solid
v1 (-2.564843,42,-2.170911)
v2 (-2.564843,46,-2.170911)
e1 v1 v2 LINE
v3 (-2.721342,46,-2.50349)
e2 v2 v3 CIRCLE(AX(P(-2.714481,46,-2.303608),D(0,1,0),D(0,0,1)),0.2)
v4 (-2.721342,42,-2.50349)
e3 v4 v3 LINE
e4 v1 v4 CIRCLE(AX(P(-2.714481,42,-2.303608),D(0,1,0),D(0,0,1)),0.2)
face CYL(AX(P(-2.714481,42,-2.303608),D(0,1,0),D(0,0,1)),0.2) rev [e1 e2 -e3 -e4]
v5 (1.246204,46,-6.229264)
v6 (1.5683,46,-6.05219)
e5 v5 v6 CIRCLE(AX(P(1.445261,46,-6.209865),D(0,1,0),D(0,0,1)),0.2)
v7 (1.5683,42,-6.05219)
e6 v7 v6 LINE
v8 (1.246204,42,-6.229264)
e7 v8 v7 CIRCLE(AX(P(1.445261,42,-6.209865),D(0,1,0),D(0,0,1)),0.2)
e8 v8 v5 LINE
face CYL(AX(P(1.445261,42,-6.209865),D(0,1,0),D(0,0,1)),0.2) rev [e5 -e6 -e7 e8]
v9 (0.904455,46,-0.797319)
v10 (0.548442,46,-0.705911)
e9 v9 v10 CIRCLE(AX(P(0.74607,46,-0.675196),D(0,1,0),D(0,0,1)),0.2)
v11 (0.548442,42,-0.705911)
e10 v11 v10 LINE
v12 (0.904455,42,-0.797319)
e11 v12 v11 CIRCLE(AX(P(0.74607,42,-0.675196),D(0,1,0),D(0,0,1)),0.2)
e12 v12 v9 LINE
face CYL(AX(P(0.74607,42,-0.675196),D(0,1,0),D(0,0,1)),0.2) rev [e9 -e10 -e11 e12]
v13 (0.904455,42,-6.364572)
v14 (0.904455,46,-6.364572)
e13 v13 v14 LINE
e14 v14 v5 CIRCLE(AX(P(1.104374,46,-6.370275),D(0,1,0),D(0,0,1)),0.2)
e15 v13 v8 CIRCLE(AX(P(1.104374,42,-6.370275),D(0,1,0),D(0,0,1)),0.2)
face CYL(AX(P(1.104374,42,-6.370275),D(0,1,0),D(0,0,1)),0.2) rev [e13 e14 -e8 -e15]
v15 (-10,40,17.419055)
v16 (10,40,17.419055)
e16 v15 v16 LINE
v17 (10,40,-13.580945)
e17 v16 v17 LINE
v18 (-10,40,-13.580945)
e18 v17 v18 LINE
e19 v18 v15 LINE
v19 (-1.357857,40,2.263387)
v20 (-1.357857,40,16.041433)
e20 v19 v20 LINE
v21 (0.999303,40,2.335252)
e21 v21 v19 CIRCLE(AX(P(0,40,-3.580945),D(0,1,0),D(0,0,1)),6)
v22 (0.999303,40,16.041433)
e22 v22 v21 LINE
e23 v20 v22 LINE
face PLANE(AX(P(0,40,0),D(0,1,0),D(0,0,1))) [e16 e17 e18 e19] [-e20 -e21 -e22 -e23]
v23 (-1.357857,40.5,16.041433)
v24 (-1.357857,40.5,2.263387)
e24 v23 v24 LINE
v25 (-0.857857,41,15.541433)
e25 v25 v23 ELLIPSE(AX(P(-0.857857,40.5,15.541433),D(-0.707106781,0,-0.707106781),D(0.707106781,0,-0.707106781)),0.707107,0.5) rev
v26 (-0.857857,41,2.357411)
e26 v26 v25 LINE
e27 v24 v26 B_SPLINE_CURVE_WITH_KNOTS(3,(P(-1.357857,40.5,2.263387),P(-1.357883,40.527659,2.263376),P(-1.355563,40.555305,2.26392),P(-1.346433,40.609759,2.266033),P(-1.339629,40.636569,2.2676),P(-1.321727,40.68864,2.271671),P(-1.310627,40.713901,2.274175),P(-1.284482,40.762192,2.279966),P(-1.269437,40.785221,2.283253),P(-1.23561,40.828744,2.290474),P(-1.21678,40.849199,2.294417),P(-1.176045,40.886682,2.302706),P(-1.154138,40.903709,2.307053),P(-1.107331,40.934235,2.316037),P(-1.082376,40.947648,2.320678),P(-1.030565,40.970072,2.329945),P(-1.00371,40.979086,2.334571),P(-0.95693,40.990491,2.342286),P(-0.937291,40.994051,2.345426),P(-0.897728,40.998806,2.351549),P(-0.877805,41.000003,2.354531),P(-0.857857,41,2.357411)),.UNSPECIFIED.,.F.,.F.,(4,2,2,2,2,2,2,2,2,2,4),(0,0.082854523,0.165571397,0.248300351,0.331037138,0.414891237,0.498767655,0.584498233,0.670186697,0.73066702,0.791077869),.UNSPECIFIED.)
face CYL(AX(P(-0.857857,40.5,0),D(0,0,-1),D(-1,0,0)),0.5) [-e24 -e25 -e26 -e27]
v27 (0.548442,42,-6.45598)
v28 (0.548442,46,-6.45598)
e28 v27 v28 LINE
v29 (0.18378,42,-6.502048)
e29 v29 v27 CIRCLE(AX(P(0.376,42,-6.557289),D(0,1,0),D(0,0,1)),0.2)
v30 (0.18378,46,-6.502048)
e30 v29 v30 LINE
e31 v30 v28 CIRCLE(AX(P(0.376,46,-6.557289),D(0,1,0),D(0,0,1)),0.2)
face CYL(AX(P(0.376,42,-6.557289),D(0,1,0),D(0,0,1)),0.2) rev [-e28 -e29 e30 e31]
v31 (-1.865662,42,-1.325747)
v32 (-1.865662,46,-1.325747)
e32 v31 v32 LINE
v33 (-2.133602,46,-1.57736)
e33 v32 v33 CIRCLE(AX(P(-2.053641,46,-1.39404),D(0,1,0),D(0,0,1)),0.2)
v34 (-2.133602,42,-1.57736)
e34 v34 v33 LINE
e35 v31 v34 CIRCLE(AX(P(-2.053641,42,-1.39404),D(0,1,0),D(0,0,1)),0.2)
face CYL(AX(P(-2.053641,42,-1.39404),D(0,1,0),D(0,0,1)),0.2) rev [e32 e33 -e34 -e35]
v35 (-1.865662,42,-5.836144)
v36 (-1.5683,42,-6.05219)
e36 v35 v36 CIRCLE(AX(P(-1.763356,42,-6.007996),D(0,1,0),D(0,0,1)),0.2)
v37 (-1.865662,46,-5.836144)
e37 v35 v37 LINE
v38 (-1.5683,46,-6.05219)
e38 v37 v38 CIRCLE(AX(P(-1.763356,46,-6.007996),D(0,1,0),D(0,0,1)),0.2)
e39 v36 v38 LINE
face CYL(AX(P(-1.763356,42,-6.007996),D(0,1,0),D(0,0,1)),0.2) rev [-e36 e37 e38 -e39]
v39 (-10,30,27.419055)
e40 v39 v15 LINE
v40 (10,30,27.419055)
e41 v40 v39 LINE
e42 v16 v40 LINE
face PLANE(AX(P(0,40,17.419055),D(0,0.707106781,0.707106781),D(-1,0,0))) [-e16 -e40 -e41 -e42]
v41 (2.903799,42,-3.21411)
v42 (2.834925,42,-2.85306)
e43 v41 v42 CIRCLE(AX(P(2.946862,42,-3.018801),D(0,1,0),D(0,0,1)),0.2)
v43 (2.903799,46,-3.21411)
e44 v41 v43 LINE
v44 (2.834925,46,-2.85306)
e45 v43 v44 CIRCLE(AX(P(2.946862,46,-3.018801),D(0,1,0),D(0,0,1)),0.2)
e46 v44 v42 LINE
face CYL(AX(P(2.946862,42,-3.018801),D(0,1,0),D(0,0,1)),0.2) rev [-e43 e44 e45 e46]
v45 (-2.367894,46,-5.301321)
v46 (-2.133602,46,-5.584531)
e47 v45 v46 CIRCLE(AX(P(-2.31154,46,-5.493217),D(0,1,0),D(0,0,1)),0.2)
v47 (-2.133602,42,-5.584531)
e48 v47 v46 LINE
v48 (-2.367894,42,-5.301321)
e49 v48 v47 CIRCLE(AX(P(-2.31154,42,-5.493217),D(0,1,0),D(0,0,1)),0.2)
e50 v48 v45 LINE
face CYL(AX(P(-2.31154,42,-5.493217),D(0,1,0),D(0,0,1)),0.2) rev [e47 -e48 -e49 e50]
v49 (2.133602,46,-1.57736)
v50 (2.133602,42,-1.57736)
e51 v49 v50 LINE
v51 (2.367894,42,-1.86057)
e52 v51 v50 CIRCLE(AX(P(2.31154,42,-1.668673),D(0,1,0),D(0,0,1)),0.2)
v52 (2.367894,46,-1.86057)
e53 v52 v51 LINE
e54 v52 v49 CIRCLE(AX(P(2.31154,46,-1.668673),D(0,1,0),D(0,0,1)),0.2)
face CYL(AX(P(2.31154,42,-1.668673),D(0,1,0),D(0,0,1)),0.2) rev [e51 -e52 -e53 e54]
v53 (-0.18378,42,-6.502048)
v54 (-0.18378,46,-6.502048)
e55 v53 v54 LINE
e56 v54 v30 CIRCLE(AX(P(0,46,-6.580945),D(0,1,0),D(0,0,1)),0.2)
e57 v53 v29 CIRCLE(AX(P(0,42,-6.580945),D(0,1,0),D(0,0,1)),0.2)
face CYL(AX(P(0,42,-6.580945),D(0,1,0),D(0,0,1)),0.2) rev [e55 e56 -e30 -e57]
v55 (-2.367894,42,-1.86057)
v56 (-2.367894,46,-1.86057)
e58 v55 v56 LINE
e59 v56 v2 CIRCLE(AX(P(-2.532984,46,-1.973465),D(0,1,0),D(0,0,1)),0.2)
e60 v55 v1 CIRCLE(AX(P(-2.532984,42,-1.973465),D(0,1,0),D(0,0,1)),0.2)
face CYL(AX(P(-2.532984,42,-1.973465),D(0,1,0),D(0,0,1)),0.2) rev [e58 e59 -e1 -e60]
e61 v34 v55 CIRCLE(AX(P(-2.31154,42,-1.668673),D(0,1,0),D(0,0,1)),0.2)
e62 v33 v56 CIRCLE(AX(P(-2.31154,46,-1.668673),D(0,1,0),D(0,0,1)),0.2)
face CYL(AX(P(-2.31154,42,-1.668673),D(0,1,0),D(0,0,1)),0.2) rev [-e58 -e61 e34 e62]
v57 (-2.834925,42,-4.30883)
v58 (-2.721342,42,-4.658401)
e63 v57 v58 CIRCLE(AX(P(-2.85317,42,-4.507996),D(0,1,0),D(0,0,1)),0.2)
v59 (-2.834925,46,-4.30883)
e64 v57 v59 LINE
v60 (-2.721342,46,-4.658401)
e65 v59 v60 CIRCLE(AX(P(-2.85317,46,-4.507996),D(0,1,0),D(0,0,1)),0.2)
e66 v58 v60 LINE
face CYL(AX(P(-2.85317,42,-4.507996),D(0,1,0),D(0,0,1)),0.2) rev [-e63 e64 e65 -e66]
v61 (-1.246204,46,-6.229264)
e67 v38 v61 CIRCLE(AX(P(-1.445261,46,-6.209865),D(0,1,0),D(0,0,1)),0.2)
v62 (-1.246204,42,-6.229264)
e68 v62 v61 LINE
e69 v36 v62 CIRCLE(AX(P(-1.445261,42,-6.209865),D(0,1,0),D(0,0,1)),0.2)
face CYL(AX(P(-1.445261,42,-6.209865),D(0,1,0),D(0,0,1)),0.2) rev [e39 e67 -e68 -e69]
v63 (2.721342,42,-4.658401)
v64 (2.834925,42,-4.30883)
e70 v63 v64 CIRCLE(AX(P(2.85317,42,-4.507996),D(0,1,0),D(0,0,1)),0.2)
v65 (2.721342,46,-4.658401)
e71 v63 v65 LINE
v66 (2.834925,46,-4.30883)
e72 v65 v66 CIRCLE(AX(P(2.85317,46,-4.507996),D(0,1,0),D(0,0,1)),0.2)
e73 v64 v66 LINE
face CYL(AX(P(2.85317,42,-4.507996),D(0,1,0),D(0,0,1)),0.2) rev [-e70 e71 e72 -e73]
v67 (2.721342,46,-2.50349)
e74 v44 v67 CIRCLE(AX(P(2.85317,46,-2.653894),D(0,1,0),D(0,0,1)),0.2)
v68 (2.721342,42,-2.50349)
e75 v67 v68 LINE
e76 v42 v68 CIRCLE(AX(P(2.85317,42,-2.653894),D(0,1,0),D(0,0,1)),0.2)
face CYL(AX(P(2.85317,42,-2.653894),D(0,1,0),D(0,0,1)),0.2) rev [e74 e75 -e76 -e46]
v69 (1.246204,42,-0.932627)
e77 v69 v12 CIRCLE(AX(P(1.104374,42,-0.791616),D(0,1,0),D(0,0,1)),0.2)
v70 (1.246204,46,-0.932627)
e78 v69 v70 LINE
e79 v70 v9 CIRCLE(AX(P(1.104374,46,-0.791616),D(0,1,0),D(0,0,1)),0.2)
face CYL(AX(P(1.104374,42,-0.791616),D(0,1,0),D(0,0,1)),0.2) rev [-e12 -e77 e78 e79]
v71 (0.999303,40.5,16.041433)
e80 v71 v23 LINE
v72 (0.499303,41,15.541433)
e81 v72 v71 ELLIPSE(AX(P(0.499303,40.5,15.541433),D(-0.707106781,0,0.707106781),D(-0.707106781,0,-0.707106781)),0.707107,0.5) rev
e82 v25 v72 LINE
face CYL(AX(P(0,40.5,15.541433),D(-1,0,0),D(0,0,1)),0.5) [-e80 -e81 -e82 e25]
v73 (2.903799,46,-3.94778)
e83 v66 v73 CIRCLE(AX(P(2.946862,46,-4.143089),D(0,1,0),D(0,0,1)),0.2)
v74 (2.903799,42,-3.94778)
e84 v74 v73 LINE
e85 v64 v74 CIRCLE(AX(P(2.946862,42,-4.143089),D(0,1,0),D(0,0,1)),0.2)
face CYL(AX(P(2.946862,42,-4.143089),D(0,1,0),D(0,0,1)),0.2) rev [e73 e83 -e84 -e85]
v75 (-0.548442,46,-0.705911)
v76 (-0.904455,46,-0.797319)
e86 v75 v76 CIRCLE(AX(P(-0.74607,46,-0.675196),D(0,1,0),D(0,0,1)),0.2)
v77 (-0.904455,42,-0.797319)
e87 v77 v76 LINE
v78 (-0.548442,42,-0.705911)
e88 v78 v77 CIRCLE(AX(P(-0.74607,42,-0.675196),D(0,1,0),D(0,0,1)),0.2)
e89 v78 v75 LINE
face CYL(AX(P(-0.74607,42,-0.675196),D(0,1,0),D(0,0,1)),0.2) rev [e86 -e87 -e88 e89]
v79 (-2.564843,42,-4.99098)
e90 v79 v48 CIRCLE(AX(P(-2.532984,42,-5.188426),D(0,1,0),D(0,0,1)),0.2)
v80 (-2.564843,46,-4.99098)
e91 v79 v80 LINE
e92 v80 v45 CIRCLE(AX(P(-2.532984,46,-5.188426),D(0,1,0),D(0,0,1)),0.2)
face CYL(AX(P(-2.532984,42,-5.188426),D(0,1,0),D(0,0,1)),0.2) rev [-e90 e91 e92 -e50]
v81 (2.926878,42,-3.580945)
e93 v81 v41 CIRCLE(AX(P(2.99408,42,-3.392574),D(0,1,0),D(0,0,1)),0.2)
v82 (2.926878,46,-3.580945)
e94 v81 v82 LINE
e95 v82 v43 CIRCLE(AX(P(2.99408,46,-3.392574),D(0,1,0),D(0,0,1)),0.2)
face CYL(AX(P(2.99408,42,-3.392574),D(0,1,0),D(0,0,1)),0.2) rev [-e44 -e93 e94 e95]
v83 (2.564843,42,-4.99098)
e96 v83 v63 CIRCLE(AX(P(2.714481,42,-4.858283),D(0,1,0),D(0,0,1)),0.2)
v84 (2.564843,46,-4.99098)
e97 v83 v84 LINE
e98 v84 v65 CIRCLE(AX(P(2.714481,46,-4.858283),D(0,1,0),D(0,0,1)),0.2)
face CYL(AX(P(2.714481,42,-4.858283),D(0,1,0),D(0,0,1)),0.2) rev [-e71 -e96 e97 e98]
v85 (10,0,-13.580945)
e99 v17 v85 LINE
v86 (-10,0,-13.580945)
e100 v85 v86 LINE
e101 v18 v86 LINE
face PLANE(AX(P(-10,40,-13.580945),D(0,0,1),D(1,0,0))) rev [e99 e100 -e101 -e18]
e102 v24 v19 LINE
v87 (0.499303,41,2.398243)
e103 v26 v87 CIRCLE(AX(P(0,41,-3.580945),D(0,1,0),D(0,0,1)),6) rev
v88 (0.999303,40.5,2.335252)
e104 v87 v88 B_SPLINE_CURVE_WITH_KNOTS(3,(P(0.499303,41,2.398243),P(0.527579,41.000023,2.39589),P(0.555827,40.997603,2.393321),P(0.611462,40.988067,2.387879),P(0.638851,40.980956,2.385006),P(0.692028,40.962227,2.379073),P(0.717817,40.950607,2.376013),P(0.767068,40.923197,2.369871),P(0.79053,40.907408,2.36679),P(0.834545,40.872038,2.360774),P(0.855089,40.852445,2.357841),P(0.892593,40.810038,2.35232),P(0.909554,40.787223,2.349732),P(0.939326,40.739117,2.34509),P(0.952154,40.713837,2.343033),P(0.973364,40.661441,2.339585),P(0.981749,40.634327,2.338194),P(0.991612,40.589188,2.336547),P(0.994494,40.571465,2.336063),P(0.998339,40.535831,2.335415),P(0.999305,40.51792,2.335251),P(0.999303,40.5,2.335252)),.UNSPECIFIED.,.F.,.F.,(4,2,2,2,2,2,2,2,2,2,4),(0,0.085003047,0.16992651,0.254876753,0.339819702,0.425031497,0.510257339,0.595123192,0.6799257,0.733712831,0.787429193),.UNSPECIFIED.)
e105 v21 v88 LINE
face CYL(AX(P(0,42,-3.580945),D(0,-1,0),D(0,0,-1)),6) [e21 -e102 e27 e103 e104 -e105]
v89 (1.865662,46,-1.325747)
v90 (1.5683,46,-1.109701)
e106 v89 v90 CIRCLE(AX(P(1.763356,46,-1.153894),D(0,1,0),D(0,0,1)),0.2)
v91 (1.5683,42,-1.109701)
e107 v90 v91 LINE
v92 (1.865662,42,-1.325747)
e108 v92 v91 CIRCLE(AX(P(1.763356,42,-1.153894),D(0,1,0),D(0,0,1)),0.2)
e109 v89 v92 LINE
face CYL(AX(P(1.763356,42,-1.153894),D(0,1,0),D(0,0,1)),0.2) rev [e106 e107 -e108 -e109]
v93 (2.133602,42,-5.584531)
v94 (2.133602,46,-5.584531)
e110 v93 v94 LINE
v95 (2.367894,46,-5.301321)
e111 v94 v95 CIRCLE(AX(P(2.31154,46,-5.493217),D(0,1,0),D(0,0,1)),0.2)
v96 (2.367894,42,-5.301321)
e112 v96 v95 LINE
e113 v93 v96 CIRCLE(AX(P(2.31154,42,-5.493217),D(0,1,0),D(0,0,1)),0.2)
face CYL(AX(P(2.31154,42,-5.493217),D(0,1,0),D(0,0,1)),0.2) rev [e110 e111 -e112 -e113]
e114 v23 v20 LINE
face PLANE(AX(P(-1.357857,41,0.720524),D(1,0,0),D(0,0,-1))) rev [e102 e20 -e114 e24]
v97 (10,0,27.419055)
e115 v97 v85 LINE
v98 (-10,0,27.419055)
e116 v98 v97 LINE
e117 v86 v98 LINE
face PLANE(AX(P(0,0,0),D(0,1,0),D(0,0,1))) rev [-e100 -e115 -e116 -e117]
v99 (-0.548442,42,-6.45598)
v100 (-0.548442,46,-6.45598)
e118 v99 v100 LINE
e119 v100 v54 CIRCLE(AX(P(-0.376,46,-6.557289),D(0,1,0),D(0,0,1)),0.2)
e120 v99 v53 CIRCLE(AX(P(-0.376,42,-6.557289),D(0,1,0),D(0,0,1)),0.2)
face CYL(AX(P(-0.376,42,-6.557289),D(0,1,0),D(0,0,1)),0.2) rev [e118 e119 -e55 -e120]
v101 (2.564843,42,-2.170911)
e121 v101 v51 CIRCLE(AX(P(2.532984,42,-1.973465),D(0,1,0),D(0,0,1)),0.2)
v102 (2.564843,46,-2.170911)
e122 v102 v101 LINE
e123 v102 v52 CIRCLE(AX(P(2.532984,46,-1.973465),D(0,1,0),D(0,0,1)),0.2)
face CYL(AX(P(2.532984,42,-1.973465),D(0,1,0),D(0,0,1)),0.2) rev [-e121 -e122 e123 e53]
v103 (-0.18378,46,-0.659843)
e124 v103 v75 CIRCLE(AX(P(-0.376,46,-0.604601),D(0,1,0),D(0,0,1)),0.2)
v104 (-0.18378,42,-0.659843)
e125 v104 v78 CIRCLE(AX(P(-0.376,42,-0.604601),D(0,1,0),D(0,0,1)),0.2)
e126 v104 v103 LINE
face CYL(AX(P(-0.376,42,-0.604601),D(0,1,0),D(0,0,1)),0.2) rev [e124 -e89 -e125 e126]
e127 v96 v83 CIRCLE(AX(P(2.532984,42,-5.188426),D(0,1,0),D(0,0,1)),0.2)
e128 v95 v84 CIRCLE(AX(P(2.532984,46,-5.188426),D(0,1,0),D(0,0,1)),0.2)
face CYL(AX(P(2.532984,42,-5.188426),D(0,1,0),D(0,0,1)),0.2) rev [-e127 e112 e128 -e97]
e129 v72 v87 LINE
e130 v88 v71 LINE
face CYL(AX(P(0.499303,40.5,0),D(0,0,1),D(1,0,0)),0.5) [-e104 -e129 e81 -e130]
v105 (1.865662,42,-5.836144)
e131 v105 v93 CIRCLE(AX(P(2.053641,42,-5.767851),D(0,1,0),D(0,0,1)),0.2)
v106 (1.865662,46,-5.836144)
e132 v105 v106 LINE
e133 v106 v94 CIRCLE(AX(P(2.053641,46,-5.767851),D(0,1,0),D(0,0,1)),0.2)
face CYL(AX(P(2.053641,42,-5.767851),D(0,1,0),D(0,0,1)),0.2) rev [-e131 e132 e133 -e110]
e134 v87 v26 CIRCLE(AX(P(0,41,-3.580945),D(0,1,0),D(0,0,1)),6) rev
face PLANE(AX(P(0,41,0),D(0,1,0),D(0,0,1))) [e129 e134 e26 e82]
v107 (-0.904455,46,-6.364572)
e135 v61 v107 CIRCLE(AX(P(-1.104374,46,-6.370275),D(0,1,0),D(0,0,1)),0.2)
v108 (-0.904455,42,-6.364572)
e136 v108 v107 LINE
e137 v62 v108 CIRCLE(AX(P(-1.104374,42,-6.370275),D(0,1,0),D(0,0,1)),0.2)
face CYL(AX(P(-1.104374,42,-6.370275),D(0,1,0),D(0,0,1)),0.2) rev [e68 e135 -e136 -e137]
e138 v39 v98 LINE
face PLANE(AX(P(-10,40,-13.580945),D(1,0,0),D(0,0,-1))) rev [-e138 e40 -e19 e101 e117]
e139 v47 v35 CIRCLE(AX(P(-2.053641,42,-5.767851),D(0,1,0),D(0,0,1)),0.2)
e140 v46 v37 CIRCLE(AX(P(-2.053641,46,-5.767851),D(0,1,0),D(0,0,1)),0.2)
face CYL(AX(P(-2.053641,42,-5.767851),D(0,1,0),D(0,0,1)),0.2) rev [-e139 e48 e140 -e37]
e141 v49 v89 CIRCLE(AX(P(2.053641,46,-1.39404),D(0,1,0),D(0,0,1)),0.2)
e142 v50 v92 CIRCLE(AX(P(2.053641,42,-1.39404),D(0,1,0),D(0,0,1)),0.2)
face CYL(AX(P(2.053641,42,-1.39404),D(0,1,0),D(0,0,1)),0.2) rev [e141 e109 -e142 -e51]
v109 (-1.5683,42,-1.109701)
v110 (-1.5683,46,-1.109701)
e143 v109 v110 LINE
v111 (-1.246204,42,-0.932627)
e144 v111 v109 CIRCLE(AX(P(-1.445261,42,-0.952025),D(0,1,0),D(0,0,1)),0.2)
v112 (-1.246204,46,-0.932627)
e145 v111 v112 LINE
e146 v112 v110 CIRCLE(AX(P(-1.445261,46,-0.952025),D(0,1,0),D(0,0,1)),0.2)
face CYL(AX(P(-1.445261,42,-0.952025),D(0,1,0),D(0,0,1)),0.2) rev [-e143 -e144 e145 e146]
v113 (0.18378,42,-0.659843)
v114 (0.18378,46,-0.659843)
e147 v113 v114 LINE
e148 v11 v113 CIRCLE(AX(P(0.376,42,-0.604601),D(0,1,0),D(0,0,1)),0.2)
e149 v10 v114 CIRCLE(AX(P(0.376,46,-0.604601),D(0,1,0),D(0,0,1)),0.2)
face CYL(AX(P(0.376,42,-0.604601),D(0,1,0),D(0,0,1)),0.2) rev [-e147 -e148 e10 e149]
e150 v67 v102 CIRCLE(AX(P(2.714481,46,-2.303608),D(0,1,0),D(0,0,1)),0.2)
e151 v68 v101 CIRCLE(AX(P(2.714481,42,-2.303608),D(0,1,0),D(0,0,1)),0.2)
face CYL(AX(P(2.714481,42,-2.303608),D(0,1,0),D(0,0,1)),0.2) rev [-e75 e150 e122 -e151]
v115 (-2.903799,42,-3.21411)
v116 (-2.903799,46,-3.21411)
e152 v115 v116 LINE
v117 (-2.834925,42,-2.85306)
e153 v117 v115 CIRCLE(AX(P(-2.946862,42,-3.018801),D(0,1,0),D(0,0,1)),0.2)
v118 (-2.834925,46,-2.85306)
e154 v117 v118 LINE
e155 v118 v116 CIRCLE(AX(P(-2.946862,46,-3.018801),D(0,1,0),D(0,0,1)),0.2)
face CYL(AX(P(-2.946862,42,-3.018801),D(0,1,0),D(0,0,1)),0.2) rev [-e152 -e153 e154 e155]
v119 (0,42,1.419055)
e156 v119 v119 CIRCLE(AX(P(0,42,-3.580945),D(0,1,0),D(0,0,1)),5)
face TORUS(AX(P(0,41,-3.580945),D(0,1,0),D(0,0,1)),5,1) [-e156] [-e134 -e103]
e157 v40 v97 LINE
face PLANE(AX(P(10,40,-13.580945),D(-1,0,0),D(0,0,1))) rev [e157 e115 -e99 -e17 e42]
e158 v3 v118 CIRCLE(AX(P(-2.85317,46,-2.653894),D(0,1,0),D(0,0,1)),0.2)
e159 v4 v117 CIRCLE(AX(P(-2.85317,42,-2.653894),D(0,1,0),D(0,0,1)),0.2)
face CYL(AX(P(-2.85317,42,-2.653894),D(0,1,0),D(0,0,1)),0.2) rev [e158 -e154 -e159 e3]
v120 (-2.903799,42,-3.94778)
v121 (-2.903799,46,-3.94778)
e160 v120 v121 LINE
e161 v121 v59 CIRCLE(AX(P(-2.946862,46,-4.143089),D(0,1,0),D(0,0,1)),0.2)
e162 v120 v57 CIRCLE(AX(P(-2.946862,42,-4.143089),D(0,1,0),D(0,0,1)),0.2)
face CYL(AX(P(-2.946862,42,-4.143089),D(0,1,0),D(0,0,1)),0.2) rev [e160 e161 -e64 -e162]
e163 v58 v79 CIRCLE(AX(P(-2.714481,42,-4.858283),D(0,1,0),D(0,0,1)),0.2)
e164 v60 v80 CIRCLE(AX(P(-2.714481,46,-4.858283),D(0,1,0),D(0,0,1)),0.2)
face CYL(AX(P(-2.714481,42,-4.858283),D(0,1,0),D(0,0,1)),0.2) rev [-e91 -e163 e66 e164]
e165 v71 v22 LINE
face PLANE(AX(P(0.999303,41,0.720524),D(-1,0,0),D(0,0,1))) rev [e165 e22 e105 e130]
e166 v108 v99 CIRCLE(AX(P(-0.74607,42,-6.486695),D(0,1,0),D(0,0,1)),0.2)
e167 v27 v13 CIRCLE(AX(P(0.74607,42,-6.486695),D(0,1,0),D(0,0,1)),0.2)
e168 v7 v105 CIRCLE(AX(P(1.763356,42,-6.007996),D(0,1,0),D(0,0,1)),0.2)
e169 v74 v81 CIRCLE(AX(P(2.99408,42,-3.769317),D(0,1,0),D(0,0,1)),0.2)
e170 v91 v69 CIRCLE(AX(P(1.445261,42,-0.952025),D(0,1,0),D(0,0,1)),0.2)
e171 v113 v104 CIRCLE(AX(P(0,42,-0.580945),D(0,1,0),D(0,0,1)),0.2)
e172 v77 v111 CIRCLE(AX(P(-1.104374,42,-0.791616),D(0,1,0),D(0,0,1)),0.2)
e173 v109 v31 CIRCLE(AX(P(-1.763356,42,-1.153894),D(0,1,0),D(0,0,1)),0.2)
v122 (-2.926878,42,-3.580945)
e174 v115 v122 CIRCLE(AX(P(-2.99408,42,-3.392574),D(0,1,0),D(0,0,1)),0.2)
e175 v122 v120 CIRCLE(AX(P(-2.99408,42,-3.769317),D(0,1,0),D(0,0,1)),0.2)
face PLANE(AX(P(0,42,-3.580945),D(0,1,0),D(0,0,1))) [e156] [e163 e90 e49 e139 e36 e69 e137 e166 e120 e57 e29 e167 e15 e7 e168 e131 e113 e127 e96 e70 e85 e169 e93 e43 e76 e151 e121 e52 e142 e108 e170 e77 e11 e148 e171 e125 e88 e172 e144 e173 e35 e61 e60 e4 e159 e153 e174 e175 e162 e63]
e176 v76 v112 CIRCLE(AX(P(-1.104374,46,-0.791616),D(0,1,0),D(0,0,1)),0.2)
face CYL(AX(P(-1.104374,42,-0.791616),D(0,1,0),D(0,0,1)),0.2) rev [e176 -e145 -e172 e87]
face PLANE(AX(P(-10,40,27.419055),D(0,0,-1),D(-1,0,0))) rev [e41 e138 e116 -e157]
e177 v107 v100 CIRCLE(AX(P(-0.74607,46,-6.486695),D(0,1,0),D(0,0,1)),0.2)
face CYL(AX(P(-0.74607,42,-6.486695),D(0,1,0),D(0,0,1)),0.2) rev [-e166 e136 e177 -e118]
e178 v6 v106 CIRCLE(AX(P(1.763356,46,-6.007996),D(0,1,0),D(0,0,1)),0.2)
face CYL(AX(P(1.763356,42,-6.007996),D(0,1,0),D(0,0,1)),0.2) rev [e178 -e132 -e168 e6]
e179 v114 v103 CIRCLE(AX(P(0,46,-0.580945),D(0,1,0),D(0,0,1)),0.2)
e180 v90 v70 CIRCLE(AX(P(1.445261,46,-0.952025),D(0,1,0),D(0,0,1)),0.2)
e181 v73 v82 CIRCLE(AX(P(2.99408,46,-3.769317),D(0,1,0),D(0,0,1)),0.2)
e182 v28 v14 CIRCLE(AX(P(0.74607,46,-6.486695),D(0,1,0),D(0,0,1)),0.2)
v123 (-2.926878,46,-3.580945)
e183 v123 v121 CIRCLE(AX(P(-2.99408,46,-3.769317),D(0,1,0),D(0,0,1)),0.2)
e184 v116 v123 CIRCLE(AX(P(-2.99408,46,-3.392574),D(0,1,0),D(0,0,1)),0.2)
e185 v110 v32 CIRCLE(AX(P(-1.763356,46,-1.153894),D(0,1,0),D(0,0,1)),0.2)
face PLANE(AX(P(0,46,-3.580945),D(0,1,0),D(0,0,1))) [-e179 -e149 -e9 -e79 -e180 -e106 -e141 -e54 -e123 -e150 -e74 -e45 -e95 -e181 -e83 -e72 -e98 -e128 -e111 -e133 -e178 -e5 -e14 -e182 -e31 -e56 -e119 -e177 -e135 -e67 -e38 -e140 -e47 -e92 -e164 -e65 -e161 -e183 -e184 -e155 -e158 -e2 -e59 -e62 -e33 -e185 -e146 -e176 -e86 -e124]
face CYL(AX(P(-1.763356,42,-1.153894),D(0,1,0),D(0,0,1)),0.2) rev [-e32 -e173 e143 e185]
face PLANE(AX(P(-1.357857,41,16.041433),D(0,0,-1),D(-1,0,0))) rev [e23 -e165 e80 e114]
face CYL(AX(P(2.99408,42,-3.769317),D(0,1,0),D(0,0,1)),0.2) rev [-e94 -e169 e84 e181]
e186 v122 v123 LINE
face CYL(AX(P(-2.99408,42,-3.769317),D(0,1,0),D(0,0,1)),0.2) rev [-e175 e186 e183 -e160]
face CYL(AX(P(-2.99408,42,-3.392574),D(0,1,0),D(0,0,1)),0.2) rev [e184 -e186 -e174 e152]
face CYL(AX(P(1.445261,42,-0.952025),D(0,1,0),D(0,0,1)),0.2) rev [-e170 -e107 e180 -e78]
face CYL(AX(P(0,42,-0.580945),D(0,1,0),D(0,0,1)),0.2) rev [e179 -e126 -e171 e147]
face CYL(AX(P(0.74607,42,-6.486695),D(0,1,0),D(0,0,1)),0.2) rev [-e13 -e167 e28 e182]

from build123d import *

# Parameters (mm, degrees)
SKETCH1_W           = 20
SKETCH1_H           = 41
BOSS_EXTRUDE1_DEPTH = 40
CHAMFER1_SIZE       = 10
SKETCH2_R           = 6
BOSS_EXTRUDE2_DEPTH = 2
FILLET1_R           = 1
SKETCH3_W           = 2.35715975
SKETCH3_H           = 15.320908912
BOSS_EXTRUDE3_DEPTH = 1
FILLET2_R           = 0.5
SKETCH4_R           = 3
BOSS_EXTRUDE4_DEPTH = 4
SKETCH5_R           = 0.2
CUT_EXTRUDE1_DEPTH  = 4


with BuildPart() as part:
    # Sketch1 → Boss-Extrude1 (new body)
    with BuildSketch(Plane(origin=(0, 0, 0), x_dir=(1, 0, 0), z_dir=(0, 1, 0))):
        with Locations((0, -6.919054605)):
            Rectangle(SKETCH1_W, SKETCH1_H)
    extrude(amount=BOSS_EXTRUDE1_DEPTH)

    # Chamfer1
    chamfer1_edges = [part.edges().sort_by_distance(p)[0] for p in [
        (0, 40, 27.419054605),
    ]]
    chamfer(chamfer1_edges, length=CHAMFER1_SIZE)

    # Sketch2 → Boss-Extrude2 (add)
    with BuildSketch(Plane(origin=(0, 40, 0), x_dir=(1, 0, 0), z_dir=(0, 1, 0))):
        with Locations(Location((0, 3.580945395, 0), (0, 0, 270))):
            Circle(SKETCH2_R)
    extrude(amount=BOSS_EXTRUDE2_DEPTH)

    # Fillet1
    fillet1_edges = [part.edges().sort_by_distance(p)[0] for p in [
        (0, 42, -9.580945395),
    ]]
    fillet(fillet1_edges, radius=FILLET1_R)

    # Sketch3 → Boss-Extrude3 (add)
    with BuildSketch(Plane(origin=(0, 40, 0), x_dir=(1, 0, 0), z_dir=(0, 1, 0))):
        with Locations((-0.179276882, -8.380978437)):
            Rectangle(SKETCH3_W, SKETCH3_H)
    extrude(amount=BOSS_EXTRUDE3_DEPTH)

    # Fillet2
    # the kernel refuses this fillet: 0.5 mm, written as the material it takes off along each edge
    with BuildSketch(Plane(origin=(0.999302993, 41, 1.085252162), x_dir=(-1, 0, 0), z_dir=(0, 0, 1))) as fillet2_piece_1_section:
        with BuildLine():
            CenterArc((FILLET2_R, FILLET2_R), FILLET2_R, 180, 90)
            Line((0, FILLET2_R), (0, 0))
            Line((0, 0), (FILLET2_R, 0))
        make_face()
    fillet2_piece_1 = extrude(amount=16.206180731, mode=Mode.PRIVATE)
    fillet2_piece_1 = fillet2_piece_1 - Plane(origin=(0, 40.888261374, -3.580945395), x_dir=(0, 0, 1), z_dir=(0, -1, 0)) * Cylinder(6, 35, mode=Mode.PRIVATE)
    add(fillet2_piece_1, mode=Mode.SUBTRACT)
    with BuildSketch(Plane(origin=(-1.357856757, 41, 17.291432893), x_dir=(1, 0, 0), z_dir=(0, 0, -1))) as fillet2_piece_2_section:
        with BuildLine():
            CenterArc((FILLET2_R, FILLET2_R), FILLET2_R, 180, 90)
            Line((0, FILLET2_R), (0, 0))
            Line((0, 0), (FILLET2_R, 0))
        make_face()
    fillet2_piece_2 = extrude(amount=16.27804556, mode=Mode.PRIVATE)
    fillet2_piece_2 = fillet2_piece_2 - Plane(origin=(0, 40.888238096, -3.580945395), x_dir=(0, 0, 1), z_dir=(0, -1, 0)) * Cylinder(6, 35, mode=Mode.PRIVATE)
    add(fillet2_piece_2, mode=Mode.SUBTRACT)
    with BuildSketch(Plane(origin=(2.249302993, 41, 16.041432893), x_dir=(0, 0, -1), z_dir=(-1, 0, 0))) as fillet2_piece_3:
        with BuildLine():
            CenterArc((FILLET2_R, FILLET2_R), FILLET2_R, 180, 90)
            Line((0, FILLET2_R), (0, 0))
            Line((0, 0), (FILLET2_R, 0))
        make_face()
    extrude(amount=4.85715975, mode=Mode.SUBTRACT)

    # Sketch4 → Boss-Extrude4 (add)
    with BuildSketch(Plane(origin=(0, 42, 0), x_dir=(1, 0, 0), z_dir=(0, 1, 0))):
        with Locations(Location((0, 3.580945395, 0), (0, 0, 270))):
            Circle(SKETCH4_R)
    extrude(amount=BOSS_EXTRUDE4_DEPTH)

    # Sketch5 → Cut-Extrude1 (cut)
    with BuildSketch(Plane(origin=(0, 46, 0), x_dir=(1, 0, 0), z_dir=(0, 1, 0))):
        with Locations((0, 0.580945395)):
            Circle(SKETCH5_R)
        with Locations((-0.375999701, 0.604601291)):
            Circle(SKETCH5_R)
        with Locations((-0.746069661, 0.675195911)):
            Circle(SKETCH5_R)
        with Locations((-1.104373658, 0.791615937)):
            Circle(SKETCH5_R)
        with Locations((-1.445261022, 0.952025355)):
            Circle(SKETCH5_R)
        with Locations((-1.763355757, 1.153894412)):
            Circle(SKETCH5_R)
        with Locations((-2.053641318, 1.394039512)):
            Circle(SKETCH5_R)
        with Locations((-2.311539728, 1.668673425)):
            Circle(SKETCH5_R)
        with Locations((-2.532983777, 1.97346501)):
            Circle(SKETCH5_R)
        with Locations((-2.714481157, 2.30360752)):
            Circle(SKETCH5_R)
        with Locations((-2.853169549, 2.653894412)):
            Circle(SKETCH5_R)
        with Locations((-2.946861752, 3.018801451)):
            Circle(SKETCH5_R)
        with Locations((-2.994080185, 3.392573836)):
            Circle(SKETCH5_R)
        with Locations((-2.994080185, 3.769316953)):
            Circle(SKETCH5_R)
        with Locations((-2.946861752, 4.143089338)):
            Circle(SKETCH5_R)
        with Locations((-2.853169549, 4.507996378)):
            Circle(SKETCH5_R)
        with Locations((-2.714481157, 4.858283269)):
            Circle(SKETCH5_R)
        with Locations((-2.532983777, 5.18842578)):
            Circle(SKETCH5_R)
        with Locations((-2.311539728, 5.493217364)):
            Circle(SKETCH5_R)
        with Locations((-2.053641318, 5.767851277)):
            Circle(SKETCH5_R)
        with Locations((-1.763355757, 6.007996378)):
            Circle(SKETCH5_R)
        with Locations((-1.445261022, 6.209865435)):
            Circle(SKETCH5_R)
        with Locations((-1.104373658, 6.370274852)):
            Circle(SKETCH5_R)
        with Locations((-0.746069661, 6.486694878)):
            Circle(SKETCH5_R)
        with Locations((-0.375999701, 6.557289499)):
            Circle(SKETCH5_R)
        with Locations((0, 6.580945395)):
            Circle(SKETCH5_R)
        with Locations((0.375999701, 6.557289499)):
            Circle(SKETCH5_R)
        with Locations((0.746069661, 6.486694878)):
            Circle(SKETCH5_R)
        with Locations((1.104373658, 6.370274852)):
            Circle(SKETCH5_R)
        with Locations((1.445261022, 6.209865435)):
            Circle(SKETCH5_R)
        with Locations((1.763355757, 6.007996378)):
            Circle(SKETCH5_R)
        with Locations((2.053641318, 5.767851277)):
            Circle(SKETCH5_R)
        with Locations((2.311539728, 5.493217364)):
            Circle(SKETCH5_R)
        with Locations((2.532983777, 5.18842578)):
            Circle(SKETCH5_R)
        with Locations((2.714481157, 4.858283269)):
            Circle(SKETCH5_R)
        with Locations((2.853169549, 4.507996378)):
            Circle(SKETCH5_R)
        with Locations((2.946861752, 4.143089338)):
            Circle(SKETCH5_R)
        with Locations((2.994080185, 3.769316953)):
            Circle(SKETCH5_R)
        with Locations((2.994080185, 3.392573836)):
            Circle(SKETCH5_R)
        with Locations((2.946861752, 3.018801451)):
            Circle(SKETCH5_R)
        with Locations((2.853169549, 2.653894412)):
            Circle(SKETCH5_R)
        with Locations((2.714481157, 2.30360752)):
            Circle(SKETCH5_R)
        with Locations((2.532983777, 1.97346501)):
            Circle(SKETCH5_R)
        with Locations((2.311539728, 1.668673425)):
            Circle(SKETCH5_R)
        with Locations((2.053641318, 1.394039512)):
            Circle(SKETCH5_R)
        with Locations((1.763355757, 1.153894412)):
            Circle(SKETCH5_R)
        with Locations((1.445261022, 0.952025355)):
            Circle(SKETCH5_R)
        with Locations((1.104373658, 0.791615937)):
            Circle(SKETCH5_R)
        with Locations((0.746069661, 0.675195911)):
            Circle(SKETCH5_R)
        with Locations((0.375999701, 0.604601291)):
            Circle(SKETCH5_R)
    extrude(amount=-CUT_EXTRUDE1_DEPTH, mode=Mode.SUBTRACT)


solid = part.part
